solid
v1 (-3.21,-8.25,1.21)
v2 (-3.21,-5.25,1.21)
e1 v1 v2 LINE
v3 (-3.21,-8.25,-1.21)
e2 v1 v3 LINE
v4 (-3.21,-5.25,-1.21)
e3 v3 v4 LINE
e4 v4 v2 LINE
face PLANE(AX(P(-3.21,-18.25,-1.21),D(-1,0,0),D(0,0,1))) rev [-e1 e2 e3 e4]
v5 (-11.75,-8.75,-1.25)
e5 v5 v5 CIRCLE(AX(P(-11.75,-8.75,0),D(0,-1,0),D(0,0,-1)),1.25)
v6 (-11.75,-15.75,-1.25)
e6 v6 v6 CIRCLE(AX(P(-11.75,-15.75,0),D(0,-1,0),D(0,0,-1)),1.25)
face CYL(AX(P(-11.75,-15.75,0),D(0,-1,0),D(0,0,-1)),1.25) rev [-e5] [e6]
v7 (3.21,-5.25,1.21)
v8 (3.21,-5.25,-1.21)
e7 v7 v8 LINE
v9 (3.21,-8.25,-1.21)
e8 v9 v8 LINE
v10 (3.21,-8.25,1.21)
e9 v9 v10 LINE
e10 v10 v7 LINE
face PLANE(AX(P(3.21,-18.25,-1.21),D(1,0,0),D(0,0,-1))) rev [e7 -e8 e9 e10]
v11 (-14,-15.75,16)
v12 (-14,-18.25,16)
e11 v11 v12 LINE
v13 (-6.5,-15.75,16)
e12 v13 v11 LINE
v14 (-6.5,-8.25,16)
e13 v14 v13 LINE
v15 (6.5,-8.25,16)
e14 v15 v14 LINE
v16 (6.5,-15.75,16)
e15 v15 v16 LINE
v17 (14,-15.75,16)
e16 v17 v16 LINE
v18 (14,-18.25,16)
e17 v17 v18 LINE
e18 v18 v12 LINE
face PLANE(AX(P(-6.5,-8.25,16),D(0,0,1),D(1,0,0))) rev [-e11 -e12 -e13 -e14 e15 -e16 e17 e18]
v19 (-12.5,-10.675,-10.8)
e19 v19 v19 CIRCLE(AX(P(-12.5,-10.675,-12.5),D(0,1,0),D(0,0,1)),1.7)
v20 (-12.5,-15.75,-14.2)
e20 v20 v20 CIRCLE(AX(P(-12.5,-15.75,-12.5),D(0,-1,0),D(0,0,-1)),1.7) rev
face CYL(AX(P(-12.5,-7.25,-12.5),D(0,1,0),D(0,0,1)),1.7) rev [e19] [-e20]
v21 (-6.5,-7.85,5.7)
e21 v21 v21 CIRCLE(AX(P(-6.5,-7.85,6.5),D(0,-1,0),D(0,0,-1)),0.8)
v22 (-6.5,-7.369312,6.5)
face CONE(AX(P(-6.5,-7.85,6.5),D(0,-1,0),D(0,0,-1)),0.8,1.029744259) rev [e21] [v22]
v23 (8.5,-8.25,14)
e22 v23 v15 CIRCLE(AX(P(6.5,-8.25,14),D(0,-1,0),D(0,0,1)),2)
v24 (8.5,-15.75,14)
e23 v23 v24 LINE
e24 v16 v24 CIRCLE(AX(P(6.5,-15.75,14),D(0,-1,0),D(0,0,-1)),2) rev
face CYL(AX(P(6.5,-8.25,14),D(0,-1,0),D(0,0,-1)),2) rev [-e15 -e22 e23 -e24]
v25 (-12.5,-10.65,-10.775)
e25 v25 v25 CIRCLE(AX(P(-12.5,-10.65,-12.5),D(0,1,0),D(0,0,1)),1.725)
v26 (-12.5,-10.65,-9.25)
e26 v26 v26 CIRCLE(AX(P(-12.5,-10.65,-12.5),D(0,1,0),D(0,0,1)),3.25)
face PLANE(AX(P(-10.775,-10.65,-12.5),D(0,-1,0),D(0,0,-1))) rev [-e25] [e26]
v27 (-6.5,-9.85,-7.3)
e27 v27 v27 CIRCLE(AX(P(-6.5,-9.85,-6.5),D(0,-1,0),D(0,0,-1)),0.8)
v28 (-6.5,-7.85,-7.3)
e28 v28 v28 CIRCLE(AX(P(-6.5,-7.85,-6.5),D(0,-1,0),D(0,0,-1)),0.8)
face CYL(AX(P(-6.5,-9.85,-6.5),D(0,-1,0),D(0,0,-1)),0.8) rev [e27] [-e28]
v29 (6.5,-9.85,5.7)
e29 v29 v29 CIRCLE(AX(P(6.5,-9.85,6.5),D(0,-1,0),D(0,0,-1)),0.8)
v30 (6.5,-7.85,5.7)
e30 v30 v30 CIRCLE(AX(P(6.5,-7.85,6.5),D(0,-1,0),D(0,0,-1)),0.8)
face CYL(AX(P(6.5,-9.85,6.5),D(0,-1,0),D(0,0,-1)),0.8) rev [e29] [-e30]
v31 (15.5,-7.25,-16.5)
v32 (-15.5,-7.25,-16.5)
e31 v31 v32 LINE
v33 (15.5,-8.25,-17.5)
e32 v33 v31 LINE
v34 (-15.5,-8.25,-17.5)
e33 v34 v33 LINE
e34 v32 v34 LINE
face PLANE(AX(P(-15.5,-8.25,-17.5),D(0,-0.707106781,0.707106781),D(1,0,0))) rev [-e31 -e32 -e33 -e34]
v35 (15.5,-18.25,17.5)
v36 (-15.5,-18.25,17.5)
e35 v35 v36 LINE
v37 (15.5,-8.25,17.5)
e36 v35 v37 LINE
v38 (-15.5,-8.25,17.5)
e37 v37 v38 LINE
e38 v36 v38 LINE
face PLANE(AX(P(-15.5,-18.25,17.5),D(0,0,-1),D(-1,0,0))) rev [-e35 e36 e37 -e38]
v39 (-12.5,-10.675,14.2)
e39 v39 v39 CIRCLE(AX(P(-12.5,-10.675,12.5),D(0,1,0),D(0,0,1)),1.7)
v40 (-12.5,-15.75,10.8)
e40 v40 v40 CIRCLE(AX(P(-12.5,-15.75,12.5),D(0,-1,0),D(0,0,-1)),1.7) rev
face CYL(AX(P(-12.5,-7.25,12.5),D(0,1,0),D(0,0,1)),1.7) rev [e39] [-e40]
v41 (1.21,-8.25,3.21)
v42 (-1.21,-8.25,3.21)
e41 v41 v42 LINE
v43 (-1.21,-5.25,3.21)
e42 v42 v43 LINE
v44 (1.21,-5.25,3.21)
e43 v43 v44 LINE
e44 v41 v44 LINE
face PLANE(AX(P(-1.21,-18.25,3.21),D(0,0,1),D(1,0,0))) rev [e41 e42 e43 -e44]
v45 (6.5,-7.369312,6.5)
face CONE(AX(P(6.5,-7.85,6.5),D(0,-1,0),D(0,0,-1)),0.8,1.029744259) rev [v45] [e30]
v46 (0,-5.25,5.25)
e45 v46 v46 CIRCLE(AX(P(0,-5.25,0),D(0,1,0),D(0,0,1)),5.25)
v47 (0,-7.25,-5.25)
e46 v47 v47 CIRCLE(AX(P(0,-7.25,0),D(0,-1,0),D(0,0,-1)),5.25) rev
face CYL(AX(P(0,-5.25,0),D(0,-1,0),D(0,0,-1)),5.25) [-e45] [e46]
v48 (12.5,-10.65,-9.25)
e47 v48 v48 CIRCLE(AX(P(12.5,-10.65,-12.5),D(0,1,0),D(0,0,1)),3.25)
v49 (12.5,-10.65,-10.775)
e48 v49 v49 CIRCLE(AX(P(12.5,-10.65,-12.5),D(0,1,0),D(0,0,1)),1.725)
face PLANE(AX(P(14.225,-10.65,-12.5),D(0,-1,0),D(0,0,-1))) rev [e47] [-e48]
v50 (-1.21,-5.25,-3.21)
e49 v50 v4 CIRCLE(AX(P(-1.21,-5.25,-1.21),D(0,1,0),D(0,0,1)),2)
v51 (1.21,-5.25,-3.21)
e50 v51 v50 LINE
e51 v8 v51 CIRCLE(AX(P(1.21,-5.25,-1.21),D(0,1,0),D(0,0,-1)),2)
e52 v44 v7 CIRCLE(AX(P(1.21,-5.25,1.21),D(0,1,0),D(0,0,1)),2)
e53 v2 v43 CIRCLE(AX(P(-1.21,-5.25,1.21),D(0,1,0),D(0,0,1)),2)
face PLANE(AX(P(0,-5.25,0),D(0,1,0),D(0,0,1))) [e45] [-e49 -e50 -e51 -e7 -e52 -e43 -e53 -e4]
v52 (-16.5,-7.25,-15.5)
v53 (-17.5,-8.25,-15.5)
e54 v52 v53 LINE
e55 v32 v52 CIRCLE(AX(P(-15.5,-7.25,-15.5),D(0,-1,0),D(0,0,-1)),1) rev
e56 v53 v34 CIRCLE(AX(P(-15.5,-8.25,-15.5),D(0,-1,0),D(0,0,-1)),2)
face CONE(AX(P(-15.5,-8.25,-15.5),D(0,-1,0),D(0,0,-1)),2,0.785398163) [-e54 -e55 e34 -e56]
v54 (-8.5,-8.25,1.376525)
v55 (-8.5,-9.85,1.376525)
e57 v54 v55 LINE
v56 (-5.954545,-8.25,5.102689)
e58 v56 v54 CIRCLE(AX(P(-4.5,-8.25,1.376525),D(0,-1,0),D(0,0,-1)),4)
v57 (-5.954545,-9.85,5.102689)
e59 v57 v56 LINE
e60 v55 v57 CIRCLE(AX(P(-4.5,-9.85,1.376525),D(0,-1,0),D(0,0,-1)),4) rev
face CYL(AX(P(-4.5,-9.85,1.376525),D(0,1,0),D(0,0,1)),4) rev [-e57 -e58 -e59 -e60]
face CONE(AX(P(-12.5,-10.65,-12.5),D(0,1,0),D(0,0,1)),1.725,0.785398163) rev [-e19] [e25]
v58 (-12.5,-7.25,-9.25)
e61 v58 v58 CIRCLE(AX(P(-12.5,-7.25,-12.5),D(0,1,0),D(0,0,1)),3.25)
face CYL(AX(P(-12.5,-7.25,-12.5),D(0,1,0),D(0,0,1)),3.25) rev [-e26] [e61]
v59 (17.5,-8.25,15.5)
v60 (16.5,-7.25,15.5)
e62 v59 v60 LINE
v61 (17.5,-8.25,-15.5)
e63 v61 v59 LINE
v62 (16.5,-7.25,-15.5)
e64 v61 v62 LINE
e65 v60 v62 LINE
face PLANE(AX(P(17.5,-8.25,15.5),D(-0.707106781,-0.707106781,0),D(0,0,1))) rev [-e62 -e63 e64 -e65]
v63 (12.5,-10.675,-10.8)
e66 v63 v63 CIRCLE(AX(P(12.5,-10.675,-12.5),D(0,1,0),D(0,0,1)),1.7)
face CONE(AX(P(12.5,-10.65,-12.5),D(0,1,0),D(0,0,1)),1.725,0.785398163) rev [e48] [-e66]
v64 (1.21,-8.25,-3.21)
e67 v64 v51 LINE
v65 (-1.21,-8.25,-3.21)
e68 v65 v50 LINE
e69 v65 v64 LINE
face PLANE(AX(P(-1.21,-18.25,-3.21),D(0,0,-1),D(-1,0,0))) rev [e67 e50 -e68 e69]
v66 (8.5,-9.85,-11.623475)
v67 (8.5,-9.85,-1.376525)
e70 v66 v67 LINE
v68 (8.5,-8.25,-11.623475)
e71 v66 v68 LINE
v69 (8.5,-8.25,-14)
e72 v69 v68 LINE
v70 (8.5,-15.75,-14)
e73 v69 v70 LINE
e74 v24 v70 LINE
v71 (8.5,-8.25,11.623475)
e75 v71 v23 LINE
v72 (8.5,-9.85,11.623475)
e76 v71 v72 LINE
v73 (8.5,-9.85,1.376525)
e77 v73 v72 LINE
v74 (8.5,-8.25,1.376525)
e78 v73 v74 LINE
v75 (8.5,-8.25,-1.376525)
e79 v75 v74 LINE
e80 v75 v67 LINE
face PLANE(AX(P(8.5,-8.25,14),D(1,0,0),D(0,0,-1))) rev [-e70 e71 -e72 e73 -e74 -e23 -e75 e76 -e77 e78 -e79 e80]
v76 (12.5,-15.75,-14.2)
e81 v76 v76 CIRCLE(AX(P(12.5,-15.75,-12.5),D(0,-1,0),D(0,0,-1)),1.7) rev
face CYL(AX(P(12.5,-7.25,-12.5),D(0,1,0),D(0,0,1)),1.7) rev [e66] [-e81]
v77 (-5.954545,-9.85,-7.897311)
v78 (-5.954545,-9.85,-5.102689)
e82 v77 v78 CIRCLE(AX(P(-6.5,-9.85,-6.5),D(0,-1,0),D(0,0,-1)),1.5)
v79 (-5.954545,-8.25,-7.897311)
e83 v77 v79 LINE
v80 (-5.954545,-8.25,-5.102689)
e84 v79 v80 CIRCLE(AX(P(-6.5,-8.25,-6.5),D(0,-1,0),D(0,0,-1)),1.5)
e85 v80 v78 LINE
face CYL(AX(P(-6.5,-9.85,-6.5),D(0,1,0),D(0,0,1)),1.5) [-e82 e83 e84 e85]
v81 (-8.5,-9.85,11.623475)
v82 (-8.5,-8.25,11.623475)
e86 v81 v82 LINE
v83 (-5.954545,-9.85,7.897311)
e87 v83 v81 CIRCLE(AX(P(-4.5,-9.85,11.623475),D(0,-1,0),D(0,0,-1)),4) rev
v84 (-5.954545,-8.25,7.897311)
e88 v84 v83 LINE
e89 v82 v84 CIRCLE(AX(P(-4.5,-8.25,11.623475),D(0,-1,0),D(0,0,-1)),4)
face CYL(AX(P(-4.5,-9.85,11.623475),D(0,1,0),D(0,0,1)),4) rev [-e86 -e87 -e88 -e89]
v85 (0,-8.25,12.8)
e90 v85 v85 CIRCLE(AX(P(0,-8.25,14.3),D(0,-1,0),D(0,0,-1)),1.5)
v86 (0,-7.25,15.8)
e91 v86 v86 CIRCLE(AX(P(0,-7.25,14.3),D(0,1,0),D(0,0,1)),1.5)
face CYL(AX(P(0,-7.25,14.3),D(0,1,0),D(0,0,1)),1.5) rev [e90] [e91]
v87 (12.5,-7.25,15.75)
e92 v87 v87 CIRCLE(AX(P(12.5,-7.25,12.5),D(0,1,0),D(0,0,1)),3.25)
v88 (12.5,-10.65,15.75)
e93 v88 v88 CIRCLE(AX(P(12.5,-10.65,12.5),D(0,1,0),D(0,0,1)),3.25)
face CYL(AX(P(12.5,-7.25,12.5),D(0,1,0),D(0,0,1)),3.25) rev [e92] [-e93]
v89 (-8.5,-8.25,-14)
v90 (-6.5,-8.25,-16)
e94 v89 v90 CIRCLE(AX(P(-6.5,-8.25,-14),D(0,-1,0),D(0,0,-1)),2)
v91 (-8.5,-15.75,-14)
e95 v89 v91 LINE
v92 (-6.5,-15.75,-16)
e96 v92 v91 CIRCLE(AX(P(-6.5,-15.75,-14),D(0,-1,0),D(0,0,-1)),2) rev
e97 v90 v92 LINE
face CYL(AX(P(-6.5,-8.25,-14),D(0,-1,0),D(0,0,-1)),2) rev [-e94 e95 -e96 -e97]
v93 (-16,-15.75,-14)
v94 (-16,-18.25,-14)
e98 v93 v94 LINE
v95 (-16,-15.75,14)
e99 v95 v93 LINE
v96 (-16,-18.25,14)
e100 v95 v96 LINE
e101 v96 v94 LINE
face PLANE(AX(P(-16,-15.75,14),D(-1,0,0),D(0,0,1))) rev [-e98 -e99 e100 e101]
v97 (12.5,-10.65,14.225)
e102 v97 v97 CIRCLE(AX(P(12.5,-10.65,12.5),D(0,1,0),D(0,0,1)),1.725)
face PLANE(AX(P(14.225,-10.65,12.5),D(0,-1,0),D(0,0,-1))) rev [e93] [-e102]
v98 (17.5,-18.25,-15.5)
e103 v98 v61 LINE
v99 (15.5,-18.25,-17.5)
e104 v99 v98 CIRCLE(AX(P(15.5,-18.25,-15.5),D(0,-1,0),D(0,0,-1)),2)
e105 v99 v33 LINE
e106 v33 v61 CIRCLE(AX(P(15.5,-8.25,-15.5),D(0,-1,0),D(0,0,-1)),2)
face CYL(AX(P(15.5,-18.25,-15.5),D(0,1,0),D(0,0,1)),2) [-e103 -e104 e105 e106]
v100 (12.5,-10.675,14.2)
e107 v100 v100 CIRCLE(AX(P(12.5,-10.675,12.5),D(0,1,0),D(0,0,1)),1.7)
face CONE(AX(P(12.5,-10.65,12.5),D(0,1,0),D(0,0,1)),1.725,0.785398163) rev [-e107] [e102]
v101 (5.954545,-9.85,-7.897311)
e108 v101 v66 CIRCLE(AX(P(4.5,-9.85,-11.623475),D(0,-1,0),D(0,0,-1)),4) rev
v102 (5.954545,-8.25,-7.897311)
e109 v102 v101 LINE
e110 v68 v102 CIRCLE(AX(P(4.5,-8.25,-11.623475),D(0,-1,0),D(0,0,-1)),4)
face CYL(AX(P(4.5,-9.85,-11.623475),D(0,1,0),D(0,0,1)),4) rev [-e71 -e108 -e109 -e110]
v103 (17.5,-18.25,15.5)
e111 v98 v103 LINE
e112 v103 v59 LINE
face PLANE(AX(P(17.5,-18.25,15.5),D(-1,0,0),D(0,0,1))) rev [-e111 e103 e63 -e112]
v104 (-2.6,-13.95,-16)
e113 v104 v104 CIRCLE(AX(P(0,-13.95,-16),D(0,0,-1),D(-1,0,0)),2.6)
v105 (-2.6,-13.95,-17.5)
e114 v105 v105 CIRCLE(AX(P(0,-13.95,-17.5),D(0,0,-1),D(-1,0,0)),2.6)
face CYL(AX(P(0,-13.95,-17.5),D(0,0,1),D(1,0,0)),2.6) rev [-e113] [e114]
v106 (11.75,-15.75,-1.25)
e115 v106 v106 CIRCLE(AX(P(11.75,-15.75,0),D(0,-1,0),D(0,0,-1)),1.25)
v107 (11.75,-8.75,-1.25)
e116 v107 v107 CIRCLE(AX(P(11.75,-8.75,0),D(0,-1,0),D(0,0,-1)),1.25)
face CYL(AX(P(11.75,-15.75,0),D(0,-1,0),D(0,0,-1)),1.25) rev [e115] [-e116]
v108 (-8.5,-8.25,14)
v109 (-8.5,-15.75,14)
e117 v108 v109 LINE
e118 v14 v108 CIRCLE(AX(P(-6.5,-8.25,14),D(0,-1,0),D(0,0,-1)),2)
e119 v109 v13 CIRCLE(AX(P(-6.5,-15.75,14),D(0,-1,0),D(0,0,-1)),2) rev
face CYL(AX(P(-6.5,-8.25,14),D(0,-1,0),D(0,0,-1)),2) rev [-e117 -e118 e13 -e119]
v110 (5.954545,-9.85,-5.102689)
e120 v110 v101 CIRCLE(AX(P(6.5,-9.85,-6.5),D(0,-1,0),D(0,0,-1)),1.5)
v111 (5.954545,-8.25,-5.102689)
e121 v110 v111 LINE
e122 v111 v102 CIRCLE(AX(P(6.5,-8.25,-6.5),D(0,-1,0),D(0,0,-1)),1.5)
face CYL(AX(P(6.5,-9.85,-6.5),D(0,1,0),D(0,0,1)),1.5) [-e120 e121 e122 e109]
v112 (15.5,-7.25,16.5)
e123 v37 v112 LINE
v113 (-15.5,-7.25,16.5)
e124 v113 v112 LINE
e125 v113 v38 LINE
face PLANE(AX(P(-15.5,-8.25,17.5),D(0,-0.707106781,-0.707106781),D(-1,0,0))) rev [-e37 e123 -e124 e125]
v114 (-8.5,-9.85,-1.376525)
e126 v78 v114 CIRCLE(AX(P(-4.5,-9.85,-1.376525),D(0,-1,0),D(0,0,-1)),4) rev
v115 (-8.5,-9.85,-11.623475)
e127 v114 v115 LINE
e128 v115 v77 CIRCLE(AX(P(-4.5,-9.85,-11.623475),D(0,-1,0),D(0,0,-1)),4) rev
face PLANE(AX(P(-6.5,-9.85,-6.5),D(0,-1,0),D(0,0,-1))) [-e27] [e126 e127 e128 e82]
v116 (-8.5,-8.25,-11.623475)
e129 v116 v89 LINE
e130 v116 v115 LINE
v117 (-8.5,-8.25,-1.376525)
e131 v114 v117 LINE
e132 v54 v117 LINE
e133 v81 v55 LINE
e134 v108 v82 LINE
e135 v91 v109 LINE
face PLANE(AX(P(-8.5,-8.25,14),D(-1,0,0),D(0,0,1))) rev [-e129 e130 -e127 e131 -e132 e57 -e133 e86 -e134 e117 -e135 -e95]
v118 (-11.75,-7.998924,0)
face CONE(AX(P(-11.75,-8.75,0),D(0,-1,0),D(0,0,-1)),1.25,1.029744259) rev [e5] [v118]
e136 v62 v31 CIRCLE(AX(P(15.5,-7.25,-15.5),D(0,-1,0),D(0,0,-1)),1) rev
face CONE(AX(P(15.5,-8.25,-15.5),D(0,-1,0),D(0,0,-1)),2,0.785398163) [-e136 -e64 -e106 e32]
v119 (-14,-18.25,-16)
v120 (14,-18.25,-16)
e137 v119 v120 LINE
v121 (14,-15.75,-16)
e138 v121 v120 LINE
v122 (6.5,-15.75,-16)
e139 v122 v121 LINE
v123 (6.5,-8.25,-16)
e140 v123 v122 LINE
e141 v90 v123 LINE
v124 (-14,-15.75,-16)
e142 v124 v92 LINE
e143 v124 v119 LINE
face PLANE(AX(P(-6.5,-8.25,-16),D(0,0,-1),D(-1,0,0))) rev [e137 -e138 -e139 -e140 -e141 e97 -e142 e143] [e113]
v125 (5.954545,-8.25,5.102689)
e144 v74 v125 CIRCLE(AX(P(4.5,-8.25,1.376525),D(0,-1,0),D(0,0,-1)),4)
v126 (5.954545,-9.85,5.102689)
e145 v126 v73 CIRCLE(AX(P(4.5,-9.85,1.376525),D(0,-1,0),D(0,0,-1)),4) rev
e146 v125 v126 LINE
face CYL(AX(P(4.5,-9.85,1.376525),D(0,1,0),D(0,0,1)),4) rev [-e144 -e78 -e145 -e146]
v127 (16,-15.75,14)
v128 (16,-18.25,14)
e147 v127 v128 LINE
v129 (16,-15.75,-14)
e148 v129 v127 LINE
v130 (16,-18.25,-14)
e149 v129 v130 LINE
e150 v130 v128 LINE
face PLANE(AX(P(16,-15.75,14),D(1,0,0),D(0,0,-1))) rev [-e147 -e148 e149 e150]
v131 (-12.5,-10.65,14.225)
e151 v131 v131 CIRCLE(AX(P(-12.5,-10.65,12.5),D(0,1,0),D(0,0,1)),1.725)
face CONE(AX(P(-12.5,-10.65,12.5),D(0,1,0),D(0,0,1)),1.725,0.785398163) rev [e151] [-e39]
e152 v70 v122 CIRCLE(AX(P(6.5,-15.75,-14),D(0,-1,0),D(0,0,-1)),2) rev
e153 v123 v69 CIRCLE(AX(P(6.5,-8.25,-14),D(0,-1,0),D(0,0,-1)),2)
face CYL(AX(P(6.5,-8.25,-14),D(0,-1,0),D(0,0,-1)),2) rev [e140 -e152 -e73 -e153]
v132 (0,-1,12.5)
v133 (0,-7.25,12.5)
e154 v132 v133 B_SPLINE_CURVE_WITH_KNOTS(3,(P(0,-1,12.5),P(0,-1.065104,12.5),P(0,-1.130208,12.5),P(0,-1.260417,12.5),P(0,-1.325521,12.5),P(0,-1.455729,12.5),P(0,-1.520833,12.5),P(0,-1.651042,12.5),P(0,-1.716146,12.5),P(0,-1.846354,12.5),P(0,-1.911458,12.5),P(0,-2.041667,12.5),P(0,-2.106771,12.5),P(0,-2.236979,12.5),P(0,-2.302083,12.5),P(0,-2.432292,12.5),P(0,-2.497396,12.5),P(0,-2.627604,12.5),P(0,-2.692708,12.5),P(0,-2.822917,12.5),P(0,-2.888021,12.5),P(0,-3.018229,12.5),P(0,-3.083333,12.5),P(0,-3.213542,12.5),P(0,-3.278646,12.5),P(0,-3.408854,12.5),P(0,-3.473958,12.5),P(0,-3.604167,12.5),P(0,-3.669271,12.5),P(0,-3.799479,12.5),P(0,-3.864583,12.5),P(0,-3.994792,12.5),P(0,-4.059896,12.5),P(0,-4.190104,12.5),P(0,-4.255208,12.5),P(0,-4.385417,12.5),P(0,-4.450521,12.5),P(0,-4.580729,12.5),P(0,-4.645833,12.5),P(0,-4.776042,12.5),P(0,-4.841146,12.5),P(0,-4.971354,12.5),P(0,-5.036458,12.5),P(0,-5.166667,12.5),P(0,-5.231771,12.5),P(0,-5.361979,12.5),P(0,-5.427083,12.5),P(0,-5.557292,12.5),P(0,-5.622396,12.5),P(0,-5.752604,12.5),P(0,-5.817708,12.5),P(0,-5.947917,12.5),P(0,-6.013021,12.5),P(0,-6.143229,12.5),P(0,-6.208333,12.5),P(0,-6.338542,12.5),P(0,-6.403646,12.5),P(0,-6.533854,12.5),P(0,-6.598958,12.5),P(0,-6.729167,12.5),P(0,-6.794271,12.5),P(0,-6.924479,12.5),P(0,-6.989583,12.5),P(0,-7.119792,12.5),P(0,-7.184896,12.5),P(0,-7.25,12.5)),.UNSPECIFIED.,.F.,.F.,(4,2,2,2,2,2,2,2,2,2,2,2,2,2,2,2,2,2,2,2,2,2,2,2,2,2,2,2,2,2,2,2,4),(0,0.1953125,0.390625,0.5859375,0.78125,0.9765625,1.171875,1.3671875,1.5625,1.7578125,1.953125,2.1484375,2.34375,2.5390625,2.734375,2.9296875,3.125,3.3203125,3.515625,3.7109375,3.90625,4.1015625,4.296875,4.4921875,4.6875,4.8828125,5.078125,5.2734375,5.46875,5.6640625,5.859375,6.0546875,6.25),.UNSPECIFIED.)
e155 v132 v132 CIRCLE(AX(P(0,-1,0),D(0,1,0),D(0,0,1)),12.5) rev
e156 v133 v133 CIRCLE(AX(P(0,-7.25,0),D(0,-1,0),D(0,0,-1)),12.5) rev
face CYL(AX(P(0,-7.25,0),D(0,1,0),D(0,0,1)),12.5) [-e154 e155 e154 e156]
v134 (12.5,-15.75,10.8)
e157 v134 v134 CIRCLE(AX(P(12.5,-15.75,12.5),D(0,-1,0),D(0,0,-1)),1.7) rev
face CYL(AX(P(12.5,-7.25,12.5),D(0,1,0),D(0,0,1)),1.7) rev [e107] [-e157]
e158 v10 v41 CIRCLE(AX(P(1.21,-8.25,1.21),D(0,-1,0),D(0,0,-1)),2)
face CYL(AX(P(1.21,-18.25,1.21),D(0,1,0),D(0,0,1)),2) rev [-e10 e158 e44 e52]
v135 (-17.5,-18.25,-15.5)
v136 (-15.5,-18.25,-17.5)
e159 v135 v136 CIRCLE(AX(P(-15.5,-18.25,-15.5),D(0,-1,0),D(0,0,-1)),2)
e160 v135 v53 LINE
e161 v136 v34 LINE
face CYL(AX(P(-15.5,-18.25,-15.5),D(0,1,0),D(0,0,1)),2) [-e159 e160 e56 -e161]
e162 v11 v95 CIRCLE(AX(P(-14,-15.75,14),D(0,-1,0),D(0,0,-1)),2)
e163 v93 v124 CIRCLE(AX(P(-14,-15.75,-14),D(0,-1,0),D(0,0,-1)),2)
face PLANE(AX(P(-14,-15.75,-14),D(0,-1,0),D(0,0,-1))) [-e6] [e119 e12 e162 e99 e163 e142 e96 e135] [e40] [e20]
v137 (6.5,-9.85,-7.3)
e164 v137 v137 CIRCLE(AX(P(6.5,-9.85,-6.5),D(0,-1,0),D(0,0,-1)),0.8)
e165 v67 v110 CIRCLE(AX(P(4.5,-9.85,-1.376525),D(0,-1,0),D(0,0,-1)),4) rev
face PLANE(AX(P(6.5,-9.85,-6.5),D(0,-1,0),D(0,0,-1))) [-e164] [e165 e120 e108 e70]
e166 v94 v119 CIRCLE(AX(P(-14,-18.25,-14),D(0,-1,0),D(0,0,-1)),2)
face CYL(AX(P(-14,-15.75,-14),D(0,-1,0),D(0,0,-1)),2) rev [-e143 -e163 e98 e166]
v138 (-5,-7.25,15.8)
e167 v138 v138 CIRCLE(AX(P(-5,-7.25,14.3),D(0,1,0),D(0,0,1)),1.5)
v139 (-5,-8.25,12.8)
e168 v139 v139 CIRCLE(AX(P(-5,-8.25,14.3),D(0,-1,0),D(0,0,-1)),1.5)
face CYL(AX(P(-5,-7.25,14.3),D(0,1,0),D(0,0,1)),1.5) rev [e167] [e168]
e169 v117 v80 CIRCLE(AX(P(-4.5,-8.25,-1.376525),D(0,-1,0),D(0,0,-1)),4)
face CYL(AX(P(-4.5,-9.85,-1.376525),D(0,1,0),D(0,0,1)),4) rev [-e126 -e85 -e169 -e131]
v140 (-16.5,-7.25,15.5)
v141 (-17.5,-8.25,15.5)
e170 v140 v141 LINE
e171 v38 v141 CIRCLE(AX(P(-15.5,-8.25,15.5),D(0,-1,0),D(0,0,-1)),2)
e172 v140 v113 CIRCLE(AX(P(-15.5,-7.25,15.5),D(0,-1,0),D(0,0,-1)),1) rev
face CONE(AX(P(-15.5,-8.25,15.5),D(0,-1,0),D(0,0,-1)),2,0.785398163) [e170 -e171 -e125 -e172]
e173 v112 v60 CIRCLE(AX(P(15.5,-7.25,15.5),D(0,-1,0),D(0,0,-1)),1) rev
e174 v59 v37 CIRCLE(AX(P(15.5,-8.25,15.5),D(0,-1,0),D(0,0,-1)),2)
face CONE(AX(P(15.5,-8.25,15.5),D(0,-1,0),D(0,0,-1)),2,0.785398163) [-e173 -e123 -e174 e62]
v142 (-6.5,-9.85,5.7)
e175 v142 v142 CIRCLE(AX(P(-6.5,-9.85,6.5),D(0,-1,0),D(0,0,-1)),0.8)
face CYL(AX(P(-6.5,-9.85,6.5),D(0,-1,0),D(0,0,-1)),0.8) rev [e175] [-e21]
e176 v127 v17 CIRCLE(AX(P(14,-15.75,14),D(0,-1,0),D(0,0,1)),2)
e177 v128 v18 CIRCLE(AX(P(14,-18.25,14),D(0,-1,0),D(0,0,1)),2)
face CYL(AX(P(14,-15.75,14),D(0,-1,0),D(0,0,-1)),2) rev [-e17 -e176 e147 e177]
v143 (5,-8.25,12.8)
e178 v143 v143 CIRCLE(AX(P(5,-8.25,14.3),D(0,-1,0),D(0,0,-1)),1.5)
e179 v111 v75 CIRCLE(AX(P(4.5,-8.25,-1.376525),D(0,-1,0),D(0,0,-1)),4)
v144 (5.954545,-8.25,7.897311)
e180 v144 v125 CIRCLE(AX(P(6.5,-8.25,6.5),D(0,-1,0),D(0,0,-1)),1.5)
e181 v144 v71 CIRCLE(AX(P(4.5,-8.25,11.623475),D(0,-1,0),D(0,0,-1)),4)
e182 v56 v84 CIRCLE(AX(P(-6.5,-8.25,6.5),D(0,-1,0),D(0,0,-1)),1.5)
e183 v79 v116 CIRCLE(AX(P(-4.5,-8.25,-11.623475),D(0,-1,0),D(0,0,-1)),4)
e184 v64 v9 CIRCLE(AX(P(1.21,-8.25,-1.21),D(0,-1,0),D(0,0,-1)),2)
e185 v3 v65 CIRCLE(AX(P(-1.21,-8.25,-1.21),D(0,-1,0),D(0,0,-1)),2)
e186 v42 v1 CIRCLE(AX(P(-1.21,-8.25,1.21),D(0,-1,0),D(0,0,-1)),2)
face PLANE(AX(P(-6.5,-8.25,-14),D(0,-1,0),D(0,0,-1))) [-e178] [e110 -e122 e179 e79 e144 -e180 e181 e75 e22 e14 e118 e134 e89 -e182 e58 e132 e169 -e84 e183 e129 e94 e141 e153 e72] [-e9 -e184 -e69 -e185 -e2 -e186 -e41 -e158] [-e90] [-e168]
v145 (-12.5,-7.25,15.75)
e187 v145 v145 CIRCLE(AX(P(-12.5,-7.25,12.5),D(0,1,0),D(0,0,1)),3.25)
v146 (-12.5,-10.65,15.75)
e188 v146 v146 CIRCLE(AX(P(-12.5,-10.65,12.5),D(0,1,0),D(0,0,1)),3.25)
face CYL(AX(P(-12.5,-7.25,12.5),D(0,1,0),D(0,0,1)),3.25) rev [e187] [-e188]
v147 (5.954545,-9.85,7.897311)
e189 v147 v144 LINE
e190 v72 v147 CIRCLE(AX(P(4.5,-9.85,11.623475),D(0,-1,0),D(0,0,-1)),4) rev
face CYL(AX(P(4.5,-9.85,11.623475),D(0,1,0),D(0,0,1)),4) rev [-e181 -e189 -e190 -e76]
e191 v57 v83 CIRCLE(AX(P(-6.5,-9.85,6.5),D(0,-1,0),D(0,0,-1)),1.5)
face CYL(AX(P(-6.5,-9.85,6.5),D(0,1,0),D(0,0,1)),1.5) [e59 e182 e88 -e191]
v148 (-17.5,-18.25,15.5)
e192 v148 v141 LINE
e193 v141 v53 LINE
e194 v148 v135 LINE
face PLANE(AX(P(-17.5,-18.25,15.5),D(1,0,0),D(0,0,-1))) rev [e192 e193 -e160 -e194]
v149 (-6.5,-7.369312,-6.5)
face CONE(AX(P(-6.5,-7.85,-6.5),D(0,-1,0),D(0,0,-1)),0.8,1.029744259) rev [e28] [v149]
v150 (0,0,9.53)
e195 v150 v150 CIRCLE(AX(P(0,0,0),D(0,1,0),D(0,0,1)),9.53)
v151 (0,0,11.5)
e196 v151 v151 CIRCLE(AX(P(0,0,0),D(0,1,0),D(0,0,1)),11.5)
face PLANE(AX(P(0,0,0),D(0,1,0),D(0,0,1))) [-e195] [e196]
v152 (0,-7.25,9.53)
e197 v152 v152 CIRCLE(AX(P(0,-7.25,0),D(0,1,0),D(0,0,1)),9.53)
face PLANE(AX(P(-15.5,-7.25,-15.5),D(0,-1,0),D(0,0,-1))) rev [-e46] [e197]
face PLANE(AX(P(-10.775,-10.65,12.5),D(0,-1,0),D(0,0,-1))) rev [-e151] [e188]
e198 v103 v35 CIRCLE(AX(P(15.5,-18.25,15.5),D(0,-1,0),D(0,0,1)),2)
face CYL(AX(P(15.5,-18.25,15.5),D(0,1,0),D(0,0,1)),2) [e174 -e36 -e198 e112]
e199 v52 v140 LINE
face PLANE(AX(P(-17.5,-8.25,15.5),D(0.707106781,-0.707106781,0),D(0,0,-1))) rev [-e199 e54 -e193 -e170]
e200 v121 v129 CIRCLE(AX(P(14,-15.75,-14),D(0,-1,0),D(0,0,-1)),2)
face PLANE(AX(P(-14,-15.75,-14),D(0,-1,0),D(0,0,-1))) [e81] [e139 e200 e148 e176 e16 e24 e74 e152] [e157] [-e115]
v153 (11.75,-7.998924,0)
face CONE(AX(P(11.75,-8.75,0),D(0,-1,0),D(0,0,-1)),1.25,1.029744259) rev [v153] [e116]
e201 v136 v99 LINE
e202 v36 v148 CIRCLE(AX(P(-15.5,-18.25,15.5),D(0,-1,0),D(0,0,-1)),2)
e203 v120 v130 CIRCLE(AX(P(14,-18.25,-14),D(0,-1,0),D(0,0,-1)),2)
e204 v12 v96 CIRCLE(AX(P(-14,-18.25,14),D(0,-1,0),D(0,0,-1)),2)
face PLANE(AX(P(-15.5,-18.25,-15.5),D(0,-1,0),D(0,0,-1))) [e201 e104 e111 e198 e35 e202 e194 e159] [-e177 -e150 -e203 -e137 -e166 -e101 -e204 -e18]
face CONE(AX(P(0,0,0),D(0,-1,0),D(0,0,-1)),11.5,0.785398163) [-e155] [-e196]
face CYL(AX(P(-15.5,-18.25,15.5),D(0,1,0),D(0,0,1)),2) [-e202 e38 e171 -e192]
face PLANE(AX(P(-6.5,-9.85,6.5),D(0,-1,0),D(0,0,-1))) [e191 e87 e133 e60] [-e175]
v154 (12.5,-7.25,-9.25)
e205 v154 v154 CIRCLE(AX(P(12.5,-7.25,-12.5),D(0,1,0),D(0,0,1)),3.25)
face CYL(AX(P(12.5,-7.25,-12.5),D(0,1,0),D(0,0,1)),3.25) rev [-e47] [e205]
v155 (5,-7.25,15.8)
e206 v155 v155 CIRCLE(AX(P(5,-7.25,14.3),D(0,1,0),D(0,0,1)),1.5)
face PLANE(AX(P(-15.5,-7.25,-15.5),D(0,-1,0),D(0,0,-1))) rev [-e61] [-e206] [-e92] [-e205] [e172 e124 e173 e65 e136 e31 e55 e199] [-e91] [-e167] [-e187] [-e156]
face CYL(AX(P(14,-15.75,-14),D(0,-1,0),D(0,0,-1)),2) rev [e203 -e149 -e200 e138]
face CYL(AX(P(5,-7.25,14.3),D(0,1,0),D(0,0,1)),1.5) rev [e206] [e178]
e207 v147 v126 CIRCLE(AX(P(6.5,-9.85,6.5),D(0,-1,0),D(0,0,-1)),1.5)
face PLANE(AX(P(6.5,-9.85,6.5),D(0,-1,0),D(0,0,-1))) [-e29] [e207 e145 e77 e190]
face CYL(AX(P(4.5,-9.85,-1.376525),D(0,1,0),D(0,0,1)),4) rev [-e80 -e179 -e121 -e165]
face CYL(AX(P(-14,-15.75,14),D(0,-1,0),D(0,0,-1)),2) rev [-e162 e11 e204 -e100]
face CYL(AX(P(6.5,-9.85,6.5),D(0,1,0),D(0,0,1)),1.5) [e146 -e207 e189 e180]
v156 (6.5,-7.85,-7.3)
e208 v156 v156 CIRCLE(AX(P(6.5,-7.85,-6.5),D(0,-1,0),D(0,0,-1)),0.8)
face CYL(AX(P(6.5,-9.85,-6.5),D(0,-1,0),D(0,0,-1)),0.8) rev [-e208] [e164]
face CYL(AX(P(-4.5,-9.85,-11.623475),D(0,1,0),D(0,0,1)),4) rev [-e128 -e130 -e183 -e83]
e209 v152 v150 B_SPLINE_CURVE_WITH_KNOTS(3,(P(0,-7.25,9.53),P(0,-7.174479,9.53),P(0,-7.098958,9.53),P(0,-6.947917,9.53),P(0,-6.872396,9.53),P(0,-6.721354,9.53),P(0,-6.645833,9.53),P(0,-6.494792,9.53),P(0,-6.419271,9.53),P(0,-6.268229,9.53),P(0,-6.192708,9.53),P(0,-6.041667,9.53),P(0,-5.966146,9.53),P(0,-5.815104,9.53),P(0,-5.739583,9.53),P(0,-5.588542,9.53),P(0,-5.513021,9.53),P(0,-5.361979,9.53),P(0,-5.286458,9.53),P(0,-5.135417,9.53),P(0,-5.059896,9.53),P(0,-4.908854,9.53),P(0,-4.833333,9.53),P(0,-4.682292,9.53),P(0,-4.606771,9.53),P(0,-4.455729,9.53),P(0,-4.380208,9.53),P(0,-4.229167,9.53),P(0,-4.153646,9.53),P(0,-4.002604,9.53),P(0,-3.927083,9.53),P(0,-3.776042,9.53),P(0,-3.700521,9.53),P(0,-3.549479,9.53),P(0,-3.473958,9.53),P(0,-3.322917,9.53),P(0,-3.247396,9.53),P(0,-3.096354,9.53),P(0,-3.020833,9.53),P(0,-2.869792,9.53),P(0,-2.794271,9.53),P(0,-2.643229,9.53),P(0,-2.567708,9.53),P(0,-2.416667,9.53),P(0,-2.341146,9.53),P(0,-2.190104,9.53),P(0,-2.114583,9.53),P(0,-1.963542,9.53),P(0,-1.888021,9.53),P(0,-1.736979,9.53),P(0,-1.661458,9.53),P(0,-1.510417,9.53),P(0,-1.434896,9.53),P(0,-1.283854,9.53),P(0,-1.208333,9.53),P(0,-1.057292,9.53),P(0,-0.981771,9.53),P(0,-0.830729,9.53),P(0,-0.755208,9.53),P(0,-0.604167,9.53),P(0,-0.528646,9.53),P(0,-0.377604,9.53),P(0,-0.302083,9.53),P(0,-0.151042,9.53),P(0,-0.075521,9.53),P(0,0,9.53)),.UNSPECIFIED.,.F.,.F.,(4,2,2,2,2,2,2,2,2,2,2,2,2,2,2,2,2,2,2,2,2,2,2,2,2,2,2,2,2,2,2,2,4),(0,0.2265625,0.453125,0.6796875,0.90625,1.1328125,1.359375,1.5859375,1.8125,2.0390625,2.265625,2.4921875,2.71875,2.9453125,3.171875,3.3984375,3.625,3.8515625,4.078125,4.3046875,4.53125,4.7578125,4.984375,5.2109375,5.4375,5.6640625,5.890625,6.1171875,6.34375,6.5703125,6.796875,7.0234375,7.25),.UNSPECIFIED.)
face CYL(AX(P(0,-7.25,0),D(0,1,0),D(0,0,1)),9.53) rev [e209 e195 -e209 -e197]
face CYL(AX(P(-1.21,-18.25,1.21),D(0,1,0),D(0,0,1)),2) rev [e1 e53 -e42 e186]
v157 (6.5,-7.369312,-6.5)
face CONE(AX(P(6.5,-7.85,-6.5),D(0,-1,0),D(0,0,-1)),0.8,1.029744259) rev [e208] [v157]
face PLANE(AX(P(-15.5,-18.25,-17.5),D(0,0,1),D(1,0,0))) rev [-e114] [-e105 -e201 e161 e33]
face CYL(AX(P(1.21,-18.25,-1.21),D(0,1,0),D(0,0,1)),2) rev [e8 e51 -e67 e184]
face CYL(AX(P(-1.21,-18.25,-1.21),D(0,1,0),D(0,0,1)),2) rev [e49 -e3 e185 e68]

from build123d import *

# Parameters (mm, degrees)
SKETCH_1_R               = 12.5
SKETCH_1_R_2             = 9.53
EXTRUDE_392_DEPTH        = 7.25
EXTRUDE_595_DEPTH        = 11
CUT_EXTRUDE_875_DEPTH    = 10
HOLE_WIZARD_3_AT_2_COUNT = 2
HOLE_WIZARD_3_AT_2_PITCH = 25
HOLE_WIZARD_3_AT_3_COUNT = 2
HOLE_WIZARD_3_AT_3_PITCH = 35.355339059
HOLE_WIZARD_3_AT_4_COUNT = 2
HOLE_WIZARD_3_AT_4_PITCH = 25
HOLE_WIZARD_1963_D       = 3
EXTRUDE_3682_DEPTH       = 1.6
HOLE_WIZARD_M2_D         = 1.6
HOLE_WIZARD_M2_DEPTH     = 2
HOLE_WIZARD_M2_TIP       = 0.480688495
SKETCH_22_R              = 2.6
CUT_EXTRUDE_4947_DEPTH   = 42.970972112
SKETCH_26_R              = 5.25
EXTRUDE_5417_DEPTH       = 2
CUT_EXTRUDE_5653_DEPTH   = 28.955321497
CHAMFER_1_SIZE           = 1
FILLET_1_R               = 4
CUT_EXTRUDE_6973_DEPTH   = 2.5
HOLE_WIZARD_3_2_D        = 2.5
HOLE_WIZARD_3_2_DEPTH    = 7
HOLE_WIZARD_3_2_TIP      = 0.751075774


with BuildPart() as part:
    # Эскиз1 → Extrude 392 (new body)
    with BuildSketch(Plane(origin=(0, 0, 0), x_dir=(1, 0, 0), z_dir=(0, 1, 0))):
        with Locations(Location((0, 0, 0), (0, 0, 270))):
            Circle(SKETCH_1_R)
        with Locations(Location((0, 0, 0), (0, 0, 270))):
            Circle(SKETCH_1_R_2, mode=Mode.SUBTRACT)
    extrude(amount=-EXTRUDE_392_DEPTH)

    # Эскиз8 → Extrude 595 (add)
    with BuildSketch(Plane.XZ.offset(7.25)):
        with BuildLine():
            Line((-15.5, 17.5), (15.5, 17.5))
            ThreePointArc((15.5, 17.5), (16.914213562, 16.914213562), (17.5, 15.5))
            Line((17.5, 15.5), (17.5, -15.5))
            ThreePointArc((17.5, -15.5), (16.914213562, -16.914213562), (15.5, -17.5))
            Line((15.5, -17.5), (-15.5, -17.5))
            ThreePointArc((-15.5, -17.5), (-16.914213562, -16.914213562), (-17.5, -15.5))
            Line((-17.5, -15.5), (-17.5, 15.5))
            ThreePointArc((-17.5, 15.5), (-16.914213562, 16.914213562), (-15.5, 17.5))
        make_face()
    extrude(amount=EXTRUDE_595_DEPTH)

    # Эскиз9 → Cut-Extrude 875 (cut)
    with BuildSketch(Plane.XZ.offset(18.25)):
        with BuildLine():
            Line((-6.5, 16), (6.5, 16))
            ThreePointArc((6.5, 16), (7.914213562, 15.414213562), (8.5, 14))
            Line((8.5, 14), (8.5, -14))
            ThreePointArc((8.5, -14), (7.914213562, -15.414213562), (6.5, -16))
            Line((6.5, -16), (-6.5, -16))
            ThreePointArc((-6.5, -16), (-7.914213562, -15.414213562), (-8.5, -14))
            Line((-8.5, -14), (-8.5, 14))
            ThreePointArc((-8.5, 14), (-7.914213562, 15.414213562), (-6.5, 16))
        make_face()
    extrude(amount=-CUT_EXTRUDE_875_DEPTH, mode=Mode.SUBTRACT)

    # Эскиз10 → Hole Wizard 3 (revolve, cut)
    with BuildSketch(Plane(origin=(-12.5, -7.25, -12.5), x_dir=(0, 0, 1), z_dir=(1, 0, 0))):
        Polygon((0, 0), (0, 11), (1.7, 11), (1.7, 3.425), (1.725, 3.4), (3.25, 3.4), (3.25, 0), align=None)
    hole_wizard_3 = revolve(axis=Axis((-12.5, -0.9, -12.5), (0, -1, 0)), mode=Mode.SUBTRACT)

    # Hole Wizard 3 at 2: Hole Wizard 3 ×2
    with Locations(*[(i * HOLE_WIZARD_3_AT_2_PITCH, 0, 0) for i in range(1, HOLE_WIZARD_3_AT_2_COUNT)]):
        add(hole_wizard_3, mode=Mode.SUBTRACT)

    # Hole Wizard 3 at 3: Hole Wizard 3 ×2
    with Locations(*[Vector(0.7071067811865476, 0, 0.7071067811865476) * (i * HOLE_WIZARD_3_AT_3_PITCH) for i in range(1, HOLE_WIZARD_3_AT_3_COUNT)]):
        add(hole_wizard_3, mode=Mode.SUBTRACT)

    # Hole Wizard 3 at 4: Hole Wizard 3 ×2
    with Locations(*[(0, 0, i * HOLE_WIZARD_3_AT_4_PITCH) for i in range(1, HOLE_WIZARD_3_AT_4_COUNT)]):
        add(hole_wizard_3, mode=Mode.SUBTRACT)

    # Hole Wizard 1963 (through all)
    with Locations(Plane(origin=(0, -7.25, 0), x_dir=(1, 0, 0), z_dir=(0, 1, 0))):
        with Locations((0, -14.3), (-5, -14.3), (5, -14.3)):
            Hole(HOLE_WIZARD_1963_D / 2)

    # Эскиз29 → Extrude 3682 (add)
    with BuildSketch(Plane.XZ.offset(8.25)):
        with BuildLine():
            Line((-6.5, -5), (-8.5, -5))
            Line((-8.5, -5), (-8.5, -8))
            Line((-8.5, -8), (-6.5, -8))
            ThreePointArc((-6.5, -8), (-5, -6.5), (-6.5, -5))
        make_face()
        with BuildLine():
            Line((6.5, -5), (8.5, -5))
            Line((8.5, -5), (8.5, -8))
            Line((8.5, -8), (6.5, -8))
            ThreePointArc((6.5, -8), (5, -6.5), (6.5, -5))
        make_face()
        with BuildLine():
            Line((-6.5, 8), (-8.5, 8))
            Line((-8.5, 8), (-8.5, 5))
            Line((-8.5, 5), (-6.5, 5))
            ThreePointArc((-6.5, 5), (-5, 6.5), (-6.5, 8))
        make_face()
        with BuildLine():
            Line((6.5, 8), (8.5, 8))
            Line((8.5, 8), (8.5, 5))
            Line((8.5, 5), (6.5, 5))
            ThreePointArc((6.5, 5), (5, 6.5), (6.5, 8))
        make_face()
    extrude(amount=EXTRUDE_3682_DEPTH)

    # Крепление платы M2
    with Locations(Plane(origin=(0, -9.85, 0), x_dir=(-1, 0, 0), z_dir=(0, -1, 0))):
        with Locations((6.5, -6.5), (-6.5, -6.5), (6.5, 6.5), (-6.5, 6.5)):
            Hole(HOLE_WIZARD_M2_D / 2, depth=HOLE_WIZARD_M2_DEPTH)
            with Locations((0, 0, -(HOLE_WIZARD_M2_DEPTH + HOLE_WIZARD_M2_TIP / 2))):  # 118° drill point
                Cone(0, HOLE_WIZARD_M2_D / 2, HOLE_WIZARD_M2_TIP, mode=Mode.SUBTRACT)

    # Эскиз22 → Cut-Extrude 4947 (cut, through all)
    with BuildSketch(Plane(origin=(0, 0, -16), x_dir=(-1, 0, 0), z_dir=(0, 0, -1))):
        with Locations((0, -13.95)):
            Circle(SKETCH_22_R)
    extrude(amount=CUT_EXTRUDE_4947_DEPTH, mode=Mode.SUBTRACT)

    # Эскиз26 → Extrude 5417 (add)
    with BuildSketch(Plane(origin=(0, -7.25, 0), x_dir=(1, 0, 0), z_dir=(0, 1, 0))):
        with Locations(Location((0, 0, 0), (0, 0, 90))):
            Circle(SKETCH_26_R)
    extrude(amount=EXTRUDE_5417_DEPTH)

    # Эскиз25 → Cut-Extrude 5653 (cut, through all)
    with BuildSketch(Plane(origin=(0, -5.25, 0), x_dir=(1, 0, 0), z_dir=(0, 1, 0))):
        with BuildLine():
            Line((-1.21, 3.21), (1.21, 3.21))
            ThreePointArc((1.21, 3.21), (2.624213562, 2.624213562), (3.21, 1.21))
            Line((3.21, 1.21), (3.21, -1.21))
            ThreePointArc((3.21, -1.21), (2.624213562, -2.624213562), (1.21, -3.21))
            Line((1.21, -3.21), (-1.21, -3.21))
            ThreePointArc((-1.21, -3.21), (-2.624213562, -2.624213562), (-3.21, -1.21))
            Line((-3.21, -1.21), (-3.21, 1.21))
            ThreePointArc((-3.21, 1.21), (-2.624213562, 2.624213562), (-1.21, 3.21))
        make_face()
    extrude(amount=-CUT_EXTRUDE_5653_DEPTH, mode=Mode.SUBTRACT)

    # Фаска 1
    chamfer_1_edges = [part.edges().sort_by_distance(p)[0] for p in [
        (0, -7.25, -17.5),
        (16.914213562, -7.25, -16.914213562),
        (17.5, -7.25, 0),
        (16.914213562, -7.25, 16.914213562),
        (0, -7.25, 17.5),
        (-16.914213562, -7.25, 16.914213562),
        (-17.5, -7.25, 0),
        (0, 0, -12.5),
        (-16.914213562, -7.25, -16.914213562),
    ]]
    chamfer(chamfer_1_edges, length=CHAMFER_1_SIZE)

    # Скругление1
    # the kernel refuses this fillet: 4 mm, written as the material it adds along each edge
    with BuildSketch(Plane(origin=(8.5, -8.25, -8), x_dir=(0, 0, -1), z_dir=(0, -1, 0)), Plane(origin=(8.5, -8.25, 5), x_dir=(0, 0, -1), z_dir=(0, -1, 0)), Plane(origin=(-8.5, -8.25, 8), x_dir=(0, 0, 1), z_dir=(0, -1, 0)), Plane(origin=(-8.5, -8.25, -5), x_dir=(0, 0, 1), z_dir=(0, -1, 0))) as fillet_1_piece_1:
        with BuildLine():
            CenterArc((3.623475383, -4), FILLET_1_R, 90, 68.676313736)
            Line((-0.102688532, -2.545454545), (-0.475304923, -2.4))
            ThreePointArc((-0.475304923, -2.4), (-0.4, -2), (-0.4, 0))
            Line((-0.4, 0), (0, 0.4))
            Line((0, 0.4), (3.623475383, 0.4))
            Line((3.623475383, 0.4), (3.623475383, 0))
        make_face()
    extrude(amount=1.6)
    with BuildSketch(Plane(origin=(8.5, -8.25, -5), x_dir=(0, 0, 1), z_dir=(0, -1, 0)), Plane(origin=(8.5, -8.25, 8), x_dir=(0, 0, 1), z_dir=(0, -1, 0)), Plane(origin=(-8.5, -8.25, 5), x_dir=(0, 0, -1), z_dir=(0, -1, 0)), Plane(origin=(-8.5, -8.25, -8), x_dir=(0, 0, -1), z_dir=(0, -1, 0))) as fillet_1_piece_2:
        with BuildLine():
            CenterArc((3.623475383, 4), FILLET_1_R, 201.323686264, 68.676313736)
            Line((-0.102688532, 2.545454545), (-0.475304923, 2.4))
            ThreePointArc((-0.475304923, 2.4), (-0.4, 2), (-0.4, 0))
            Line((-0.4, 0), (0, -0.4))
            Line((0, -0.4), (3.623475383, -0.4))
            Line((3.623475383, -0.4), (3.623475383, 0))
        make_face()
    extrude(amount=1.6)

    # Эскиз36 → Cut-Extrude 6973 (cut)
    with BuildSketch(Plane.XZ.offset(18.25)):
        with BuildLine():
            Line((-14, 16), (14, 16))
            ThreePointArc((14, 16), (15.414213562, 15.414213562), (16, 14))
            Line((16, 14), (16, -14))
            ThreePointArc((16, -14), (15.414213562, -15.414213562), (14, -16))
            Line((14, -16), (-14, -16))
            ThreePointArc((-14, -16), (-15.414213562, -15.414213562), (-16, -14))
            Line((-16, -14), (-16, 14))
            ThreePointArc((-16, 14), (-15.414213562, 15.414213562), (-14, 16))
        make_face()
    extrude(amount=-CUT_EXTRUDE_6973_DEPTH, mode=Mode.SUBTRACT)

    # Hole Wizard 3 2
    with Locations(Plane(origin=(0, -15.75, 0), x_dir=(-1, 0, 0), z_dir=(0, -1, 0))):
        with Locations((11.75, 0), (-11.75, 0)):
            Hole(HOLE_WIZARD_3_2_D / 2, depth=HOLE_WIZARD_3_2_DEPTH)
            with Locations((0, 0, -(HOLE_WIZARD_3_2_DEPTH + HOLE_WIZARD_3_2_TIP / 2))):  # 118° drill point
                Cone(0, HOLE_WIZARD_3_2_D / 2, HOLE_WIZARD_3_2_TIP, mode=Mode.SUBTRACT)


solid = part.part
